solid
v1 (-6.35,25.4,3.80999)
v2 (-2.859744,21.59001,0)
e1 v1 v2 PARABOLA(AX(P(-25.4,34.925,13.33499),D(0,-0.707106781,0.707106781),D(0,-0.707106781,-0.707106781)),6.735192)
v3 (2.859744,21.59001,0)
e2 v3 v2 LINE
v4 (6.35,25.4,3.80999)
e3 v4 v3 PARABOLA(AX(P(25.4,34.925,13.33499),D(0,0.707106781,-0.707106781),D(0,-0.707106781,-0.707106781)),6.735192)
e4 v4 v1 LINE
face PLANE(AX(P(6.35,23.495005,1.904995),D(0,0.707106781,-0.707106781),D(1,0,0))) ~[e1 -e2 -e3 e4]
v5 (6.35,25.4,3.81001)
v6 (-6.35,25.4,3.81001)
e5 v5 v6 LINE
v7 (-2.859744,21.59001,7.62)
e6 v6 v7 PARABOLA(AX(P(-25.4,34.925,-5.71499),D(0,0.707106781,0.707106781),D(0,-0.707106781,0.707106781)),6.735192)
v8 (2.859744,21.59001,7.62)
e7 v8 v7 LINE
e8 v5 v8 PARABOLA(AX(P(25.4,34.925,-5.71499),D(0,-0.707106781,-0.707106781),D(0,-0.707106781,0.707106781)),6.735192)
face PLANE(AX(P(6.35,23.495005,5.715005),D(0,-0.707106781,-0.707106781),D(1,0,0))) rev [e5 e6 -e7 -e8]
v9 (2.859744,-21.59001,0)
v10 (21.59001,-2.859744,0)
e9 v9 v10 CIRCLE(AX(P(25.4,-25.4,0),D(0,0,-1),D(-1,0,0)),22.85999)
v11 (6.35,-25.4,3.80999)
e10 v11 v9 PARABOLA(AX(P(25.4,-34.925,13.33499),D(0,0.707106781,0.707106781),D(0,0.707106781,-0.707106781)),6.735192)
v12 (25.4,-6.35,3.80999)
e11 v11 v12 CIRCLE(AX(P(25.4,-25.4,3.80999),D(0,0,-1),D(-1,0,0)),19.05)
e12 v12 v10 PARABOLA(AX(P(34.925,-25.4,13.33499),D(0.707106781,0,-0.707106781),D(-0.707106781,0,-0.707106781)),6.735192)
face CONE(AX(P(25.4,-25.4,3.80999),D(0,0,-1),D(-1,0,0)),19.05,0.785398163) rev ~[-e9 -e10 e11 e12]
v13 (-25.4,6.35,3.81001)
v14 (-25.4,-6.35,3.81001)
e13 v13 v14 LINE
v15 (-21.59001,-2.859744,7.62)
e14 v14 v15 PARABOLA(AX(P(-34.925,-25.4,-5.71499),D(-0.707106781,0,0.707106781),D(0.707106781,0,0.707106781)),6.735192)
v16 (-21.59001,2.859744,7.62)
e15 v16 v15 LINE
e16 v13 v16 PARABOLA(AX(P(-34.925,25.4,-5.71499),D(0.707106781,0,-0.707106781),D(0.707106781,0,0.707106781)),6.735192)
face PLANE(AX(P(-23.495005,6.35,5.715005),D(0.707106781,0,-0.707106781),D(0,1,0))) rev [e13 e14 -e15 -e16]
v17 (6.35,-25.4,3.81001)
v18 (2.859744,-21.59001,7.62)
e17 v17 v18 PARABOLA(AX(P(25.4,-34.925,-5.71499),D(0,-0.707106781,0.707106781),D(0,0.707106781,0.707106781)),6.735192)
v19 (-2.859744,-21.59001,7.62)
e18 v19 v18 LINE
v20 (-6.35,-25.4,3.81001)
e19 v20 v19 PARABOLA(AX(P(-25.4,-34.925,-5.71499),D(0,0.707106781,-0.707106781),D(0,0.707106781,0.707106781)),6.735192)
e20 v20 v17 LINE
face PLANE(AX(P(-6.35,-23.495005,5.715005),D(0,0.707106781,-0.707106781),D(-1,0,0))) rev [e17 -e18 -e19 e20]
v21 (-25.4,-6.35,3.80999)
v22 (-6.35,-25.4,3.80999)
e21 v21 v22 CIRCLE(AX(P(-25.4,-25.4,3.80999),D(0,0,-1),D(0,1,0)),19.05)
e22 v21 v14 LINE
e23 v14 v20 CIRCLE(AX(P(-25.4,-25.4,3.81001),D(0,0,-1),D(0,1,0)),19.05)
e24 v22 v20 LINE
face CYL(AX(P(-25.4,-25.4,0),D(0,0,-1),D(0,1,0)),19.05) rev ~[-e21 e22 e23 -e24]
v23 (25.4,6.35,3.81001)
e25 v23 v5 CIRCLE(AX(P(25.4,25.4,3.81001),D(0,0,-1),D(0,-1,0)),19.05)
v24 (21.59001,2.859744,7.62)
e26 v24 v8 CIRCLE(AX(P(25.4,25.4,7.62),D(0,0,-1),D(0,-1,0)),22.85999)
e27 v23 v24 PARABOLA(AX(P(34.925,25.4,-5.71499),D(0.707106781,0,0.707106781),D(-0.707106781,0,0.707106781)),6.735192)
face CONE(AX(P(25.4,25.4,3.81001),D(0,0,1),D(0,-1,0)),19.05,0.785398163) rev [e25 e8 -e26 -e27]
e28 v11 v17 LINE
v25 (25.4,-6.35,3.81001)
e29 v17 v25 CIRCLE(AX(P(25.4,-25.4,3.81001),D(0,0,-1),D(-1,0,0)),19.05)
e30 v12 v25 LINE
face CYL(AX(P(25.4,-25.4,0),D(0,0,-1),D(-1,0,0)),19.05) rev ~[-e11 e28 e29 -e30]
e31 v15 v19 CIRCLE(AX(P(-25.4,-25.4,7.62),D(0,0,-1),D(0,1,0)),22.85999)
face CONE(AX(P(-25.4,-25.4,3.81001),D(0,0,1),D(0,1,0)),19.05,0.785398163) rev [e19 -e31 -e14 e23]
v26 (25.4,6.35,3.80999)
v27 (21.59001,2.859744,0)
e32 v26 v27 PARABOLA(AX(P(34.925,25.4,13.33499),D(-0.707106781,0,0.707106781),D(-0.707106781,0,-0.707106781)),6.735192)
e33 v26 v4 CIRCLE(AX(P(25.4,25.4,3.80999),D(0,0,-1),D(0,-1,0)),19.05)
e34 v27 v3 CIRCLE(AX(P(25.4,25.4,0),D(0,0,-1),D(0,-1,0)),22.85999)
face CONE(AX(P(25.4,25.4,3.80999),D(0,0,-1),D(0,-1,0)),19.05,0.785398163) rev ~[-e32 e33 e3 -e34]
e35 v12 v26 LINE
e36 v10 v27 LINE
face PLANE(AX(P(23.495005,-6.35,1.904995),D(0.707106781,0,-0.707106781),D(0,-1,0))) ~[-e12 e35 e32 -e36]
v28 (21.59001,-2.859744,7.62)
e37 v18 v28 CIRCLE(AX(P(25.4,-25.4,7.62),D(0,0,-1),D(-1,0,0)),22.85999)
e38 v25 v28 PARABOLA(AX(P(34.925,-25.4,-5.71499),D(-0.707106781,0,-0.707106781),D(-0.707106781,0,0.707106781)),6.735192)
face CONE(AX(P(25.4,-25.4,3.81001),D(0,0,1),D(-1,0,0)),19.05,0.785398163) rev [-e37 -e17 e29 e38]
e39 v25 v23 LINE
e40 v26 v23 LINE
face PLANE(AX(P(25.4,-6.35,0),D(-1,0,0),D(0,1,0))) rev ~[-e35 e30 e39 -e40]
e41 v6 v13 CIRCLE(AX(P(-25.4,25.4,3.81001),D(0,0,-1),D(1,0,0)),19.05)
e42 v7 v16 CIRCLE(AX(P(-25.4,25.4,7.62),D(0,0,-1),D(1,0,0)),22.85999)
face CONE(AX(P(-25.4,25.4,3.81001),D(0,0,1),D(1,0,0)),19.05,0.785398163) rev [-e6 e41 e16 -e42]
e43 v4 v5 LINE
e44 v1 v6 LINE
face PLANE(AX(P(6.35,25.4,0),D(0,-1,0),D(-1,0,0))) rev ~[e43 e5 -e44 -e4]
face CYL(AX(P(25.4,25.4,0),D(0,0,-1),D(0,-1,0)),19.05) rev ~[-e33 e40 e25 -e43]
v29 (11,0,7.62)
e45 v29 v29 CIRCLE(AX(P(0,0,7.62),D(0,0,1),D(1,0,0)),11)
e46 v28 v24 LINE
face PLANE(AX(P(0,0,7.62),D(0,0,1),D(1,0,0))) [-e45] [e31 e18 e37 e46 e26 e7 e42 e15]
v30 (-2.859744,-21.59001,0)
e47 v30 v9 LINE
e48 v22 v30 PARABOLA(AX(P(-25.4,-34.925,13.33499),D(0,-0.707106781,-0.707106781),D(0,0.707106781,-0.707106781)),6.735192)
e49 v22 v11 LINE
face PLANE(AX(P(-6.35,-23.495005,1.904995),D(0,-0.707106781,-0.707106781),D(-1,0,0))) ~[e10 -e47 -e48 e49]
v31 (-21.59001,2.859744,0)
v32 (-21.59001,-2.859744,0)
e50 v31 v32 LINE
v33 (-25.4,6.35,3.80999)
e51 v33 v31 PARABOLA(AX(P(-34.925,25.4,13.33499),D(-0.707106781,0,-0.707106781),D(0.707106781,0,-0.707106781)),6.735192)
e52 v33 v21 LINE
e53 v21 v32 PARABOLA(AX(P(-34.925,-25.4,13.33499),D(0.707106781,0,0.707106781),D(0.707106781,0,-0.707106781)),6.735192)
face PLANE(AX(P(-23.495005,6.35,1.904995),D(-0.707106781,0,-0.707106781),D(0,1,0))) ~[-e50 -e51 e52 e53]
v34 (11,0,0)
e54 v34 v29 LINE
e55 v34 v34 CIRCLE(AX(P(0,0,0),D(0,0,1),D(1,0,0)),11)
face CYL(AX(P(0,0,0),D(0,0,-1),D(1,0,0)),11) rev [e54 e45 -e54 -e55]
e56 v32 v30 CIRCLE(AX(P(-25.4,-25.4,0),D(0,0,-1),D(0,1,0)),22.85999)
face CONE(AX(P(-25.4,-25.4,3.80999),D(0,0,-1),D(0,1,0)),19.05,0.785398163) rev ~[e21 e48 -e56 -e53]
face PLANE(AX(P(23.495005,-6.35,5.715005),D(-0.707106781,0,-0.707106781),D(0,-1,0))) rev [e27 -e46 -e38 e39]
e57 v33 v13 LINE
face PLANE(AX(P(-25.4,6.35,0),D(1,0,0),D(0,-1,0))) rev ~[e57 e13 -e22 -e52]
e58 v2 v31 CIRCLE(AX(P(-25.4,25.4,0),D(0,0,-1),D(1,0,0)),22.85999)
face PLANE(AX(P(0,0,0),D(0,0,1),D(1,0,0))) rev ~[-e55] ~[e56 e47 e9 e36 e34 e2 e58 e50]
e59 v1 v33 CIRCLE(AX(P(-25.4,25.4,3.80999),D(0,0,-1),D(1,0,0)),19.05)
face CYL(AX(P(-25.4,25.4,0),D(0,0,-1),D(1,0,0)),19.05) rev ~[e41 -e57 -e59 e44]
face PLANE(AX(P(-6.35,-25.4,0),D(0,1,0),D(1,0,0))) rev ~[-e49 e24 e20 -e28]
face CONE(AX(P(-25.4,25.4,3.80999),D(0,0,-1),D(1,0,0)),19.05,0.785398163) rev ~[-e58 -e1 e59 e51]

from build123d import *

# Parameters (mm, degrees)
F0_R     = 11
F1_DEPTH = 7.62
F2_SIZE  = 3.80999


# Not quite as in the source:
# - a fillet or chamfer is up to 0.001 mm smaller than in the source, because OpenCascade refuses the exact size


with BuildPart() as f1:
    # F0 (on Top) → F1 (new body)
    with BuildSketch(Plane.XY):
        with BuildLine():
            Line((6.35, 25.4), (-6.35, 25.4))
            ThreePointArc((-6.35, 25.4), (-11.9296158184, 11.9296158184), (-25.4, 6.35))
            Line((-25.4, 6.35), (-25.4, -6.35))
            ThreePointArc((-25.4, -6.35), (-11.9296158184, -11.9296158184), (-6.35, -25.4))
            Line((-6.35, -25.4), (6.35, -25.4))
            ThreePointArc((6.35, -25.4), (11.9296158184, -11.9296158184), (25.4, -6.35))
            Line((25.4, -6.35), (25.4, 6.35))
            ThreePointArc((25.4, 6.35), (11.9296158184, 11.9296158184), (6.35, 25.4))
        make_face()
        Circle(F0_R, mode=Mode.SUBTRACT)
    extrude(amount=F1_DEPTH)

    # F2 (size 3.81 in the source; OpenCascade refuses exactly that, so slightly less here)
    f2_edges = [f1.edges().sort_by_distance(p)[0] for p in [
        (11.929616, 11.929616, 7.62),
        (-11.929616, 11.929616, 7.62),
        (0, 25.4, 7.62),
        (25.4, 0, 7.62),
        (11.929616, -11.929616, 7.62),
        (0, -25.4, 7.62),
        (-11.929616, -11.929616, 7.62),
        (-25.4, 0, 7.62),
        (-11.929616, 11.929616, 0),
        (0, 25.4, 0),
        (11.929616, 11.929616, 0),
        (11.929616, -11.929616, 0),
        (25.4, 0, 0),
        (-11.929616, -11.929616, 0),
        (0, -25.4, 0),
        (-25.4, 0, 0),
    ]]
    chamfer(f2_edges, length=F2_SIZE)


solid = f1.part
